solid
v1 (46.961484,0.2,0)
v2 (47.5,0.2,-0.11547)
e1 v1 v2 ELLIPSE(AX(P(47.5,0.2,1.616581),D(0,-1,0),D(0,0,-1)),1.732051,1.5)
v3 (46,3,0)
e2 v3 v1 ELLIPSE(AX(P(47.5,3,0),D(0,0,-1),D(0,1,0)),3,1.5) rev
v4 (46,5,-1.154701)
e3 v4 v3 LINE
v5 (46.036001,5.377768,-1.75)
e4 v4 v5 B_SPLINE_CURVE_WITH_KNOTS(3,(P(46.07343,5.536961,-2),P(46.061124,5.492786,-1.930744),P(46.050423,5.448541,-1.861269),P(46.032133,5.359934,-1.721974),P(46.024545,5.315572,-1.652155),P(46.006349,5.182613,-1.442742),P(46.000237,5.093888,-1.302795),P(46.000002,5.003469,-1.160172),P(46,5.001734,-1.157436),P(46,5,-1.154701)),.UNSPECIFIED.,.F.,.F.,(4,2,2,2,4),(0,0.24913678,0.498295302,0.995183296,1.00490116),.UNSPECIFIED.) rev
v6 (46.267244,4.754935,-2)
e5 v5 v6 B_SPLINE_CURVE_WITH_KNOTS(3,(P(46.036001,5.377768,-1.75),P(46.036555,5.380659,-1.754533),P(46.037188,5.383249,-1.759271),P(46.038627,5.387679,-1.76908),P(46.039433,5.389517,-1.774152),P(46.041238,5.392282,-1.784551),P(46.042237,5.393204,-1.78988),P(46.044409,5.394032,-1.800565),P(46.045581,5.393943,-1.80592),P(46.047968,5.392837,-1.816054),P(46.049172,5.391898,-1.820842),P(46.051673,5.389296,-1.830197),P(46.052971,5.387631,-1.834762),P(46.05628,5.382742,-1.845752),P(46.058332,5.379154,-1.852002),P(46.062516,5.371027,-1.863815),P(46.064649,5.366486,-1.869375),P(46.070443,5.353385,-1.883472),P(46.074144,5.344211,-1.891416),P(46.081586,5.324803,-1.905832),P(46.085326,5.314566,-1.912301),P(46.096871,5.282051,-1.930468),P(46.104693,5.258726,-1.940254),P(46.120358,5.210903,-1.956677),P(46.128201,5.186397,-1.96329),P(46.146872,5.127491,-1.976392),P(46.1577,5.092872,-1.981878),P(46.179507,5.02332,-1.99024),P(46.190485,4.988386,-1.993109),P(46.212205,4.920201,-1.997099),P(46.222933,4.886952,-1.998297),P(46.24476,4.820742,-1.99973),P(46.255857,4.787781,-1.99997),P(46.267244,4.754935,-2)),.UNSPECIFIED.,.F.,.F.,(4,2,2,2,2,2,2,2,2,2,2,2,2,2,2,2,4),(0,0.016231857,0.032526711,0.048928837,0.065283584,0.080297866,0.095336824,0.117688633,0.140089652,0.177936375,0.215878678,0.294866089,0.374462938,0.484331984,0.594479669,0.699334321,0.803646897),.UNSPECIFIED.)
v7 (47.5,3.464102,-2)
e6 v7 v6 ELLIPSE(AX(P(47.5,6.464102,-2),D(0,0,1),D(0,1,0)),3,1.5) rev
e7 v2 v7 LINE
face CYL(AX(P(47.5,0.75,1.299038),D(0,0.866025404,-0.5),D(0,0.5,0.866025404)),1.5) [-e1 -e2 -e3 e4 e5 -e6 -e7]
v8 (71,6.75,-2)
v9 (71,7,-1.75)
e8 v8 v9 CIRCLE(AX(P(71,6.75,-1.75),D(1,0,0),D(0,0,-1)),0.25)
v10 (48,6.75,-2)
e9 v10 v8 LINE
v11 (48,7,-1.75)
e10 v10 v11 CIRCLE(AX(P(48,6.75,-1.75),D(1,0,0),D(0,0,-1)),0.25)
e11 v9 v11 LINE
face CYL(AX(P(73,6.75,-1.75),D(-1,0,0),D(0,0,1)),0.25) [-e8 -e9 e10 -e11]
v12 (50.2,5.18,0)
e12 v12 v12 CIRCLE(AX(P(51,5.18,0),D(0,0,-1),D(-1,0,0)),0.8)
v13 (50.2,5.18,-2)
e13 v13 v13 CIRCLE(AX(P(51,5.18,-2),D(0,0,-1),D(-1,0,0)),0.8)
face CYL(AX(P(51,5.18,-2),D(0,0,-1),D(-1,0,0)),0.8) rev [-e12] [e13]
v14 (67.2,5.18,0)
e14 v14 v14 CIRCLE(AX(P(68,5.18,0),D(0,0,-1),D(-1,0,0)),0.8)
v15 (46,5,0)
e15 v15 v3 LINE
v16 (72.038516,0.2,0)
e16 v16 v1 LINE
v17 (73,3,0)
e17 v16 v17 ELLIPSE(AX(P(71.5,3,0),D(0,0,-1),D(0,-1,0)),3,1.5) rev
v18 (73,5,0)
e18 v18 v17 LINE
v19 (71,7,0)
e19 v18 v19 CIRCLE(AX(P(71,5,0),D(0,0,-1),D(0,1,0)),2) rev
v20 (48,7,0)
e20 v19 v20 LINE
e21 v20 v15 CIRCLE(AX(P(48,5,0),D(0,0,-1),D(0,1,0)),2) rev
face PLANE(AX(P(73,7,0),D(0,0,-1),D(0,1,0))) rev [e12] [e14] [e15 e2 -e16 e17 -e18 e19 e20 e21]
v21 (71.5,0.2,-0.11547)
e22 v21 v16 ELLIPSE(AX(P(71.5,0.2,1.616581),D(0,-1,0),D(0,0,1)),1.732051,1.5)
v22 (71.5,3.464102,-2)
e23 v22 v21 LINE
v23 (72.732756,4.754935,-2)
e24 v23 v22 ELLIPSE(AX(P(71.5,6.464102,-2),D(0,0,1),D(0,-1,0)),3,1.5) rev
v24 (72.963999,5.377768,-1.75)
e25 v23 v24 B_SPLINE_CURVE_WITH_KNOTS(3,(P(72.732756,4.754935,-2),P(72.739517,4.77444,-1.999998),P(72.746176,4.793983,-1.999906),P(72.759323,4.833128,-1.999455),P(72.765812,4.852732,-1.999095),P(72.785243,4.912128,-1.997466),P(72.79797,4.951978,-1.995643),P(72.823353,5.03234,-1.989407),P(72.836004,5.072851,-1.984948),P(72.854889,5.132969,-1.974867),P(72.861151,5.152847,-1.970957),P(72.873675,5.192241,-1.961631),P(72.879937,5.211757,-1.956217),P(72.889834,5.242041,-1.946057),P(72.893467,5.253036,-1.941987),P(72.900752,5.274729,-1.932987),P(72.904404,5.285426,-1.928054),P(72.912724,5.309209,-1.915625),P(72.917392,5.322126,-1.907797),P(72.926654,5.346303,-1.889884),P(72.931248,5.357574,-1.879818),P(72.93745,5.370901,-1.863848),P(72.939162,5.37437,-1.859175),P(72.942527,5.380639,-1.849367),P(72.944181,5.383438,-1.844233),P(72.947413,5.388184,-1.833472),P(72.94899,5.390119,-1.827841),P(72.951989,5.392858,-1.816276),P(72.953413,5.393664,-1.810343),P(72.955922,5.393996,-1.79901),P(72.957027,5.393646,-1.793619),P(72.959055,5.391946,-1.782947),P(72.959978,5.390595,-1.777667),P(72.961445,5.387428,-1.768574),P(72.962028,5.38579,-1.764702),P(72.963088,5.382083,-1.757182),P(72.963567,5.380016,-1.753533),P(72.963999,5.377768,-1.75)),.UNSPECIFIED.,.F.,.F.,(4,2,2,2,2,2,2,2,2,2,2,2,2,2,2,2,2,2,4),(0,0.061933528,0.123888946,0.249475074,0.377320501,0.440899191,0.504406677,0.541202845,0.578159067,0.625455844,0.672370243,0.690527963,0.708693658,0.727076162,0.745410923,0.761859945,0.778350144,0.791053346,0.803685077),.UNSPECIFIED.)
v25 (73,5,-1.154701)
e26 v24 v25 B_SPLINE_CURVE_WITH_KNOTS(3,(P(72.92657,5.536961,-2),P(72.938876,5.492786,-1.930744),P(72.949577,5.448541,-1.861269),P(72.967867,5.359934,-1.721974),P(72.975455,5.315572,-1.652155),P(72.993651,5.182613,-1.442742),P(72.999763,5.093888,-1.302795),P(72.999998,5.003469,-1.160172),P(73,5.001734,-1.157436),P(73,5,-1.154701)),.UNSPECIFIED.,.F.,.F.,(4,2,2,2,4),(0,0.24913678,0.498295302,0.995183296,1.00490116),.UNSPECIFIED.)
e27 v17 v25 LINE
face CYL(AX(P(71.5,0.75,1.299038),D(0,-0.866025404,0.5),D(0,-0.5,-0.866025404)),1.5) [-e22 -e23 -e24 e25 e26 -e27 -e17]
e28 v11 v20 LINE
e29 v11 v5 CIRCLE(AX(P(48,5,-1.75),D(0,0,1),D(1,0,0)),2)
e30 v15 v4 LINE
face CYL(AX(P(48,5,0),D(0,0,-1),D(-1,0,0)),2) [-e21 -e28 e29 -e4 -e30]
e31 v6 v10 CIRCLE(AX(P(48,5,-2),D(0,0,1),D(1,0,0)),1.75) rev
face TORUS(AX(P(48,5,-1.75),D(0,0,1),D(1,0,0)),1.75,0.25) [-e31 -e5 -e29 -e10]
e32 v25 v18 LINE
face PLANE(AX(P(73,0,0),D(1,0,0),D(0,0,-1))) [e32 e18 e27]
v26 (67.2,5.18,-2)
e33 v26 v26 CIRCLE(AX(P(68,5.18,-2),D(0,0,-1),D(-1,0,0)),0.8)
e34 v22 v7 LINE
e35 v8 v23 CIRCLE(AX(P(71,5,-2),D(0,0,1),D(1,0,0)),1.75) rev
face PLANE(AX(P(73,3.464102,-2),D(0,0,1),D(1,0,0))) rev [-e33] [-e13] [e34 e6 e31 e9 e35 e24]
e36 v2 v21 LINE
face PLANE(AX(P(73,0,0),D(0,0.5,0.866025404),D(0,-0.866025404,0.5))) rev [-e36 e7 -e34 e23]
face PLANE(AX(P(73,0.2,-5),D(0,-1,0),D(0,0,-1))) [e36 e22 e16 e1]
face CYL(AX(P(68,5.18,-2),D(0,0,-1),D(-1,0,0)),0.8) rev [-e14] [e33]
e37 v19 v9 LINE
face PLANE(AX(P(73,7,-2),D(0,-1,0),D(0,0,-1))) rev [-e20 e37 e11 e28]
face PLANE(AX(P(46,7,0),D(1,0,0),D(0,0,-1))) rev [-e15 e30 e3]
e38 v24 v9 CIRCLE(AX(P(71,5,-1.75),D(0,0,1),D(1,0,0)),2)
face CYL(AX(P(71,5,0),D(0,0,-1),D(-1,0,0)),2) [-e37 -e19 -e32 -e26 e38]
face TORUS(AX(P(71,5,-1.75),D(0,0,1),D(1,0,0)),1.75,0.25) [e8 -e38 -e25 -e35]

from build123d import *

# Parameters (mm, degrees)
WEDGE_GENERAL_SHAPE_DEPTH       = 73
SKETCH7_W                       = 10
SKETCH7_H                       = 0.2
KNIFE_EDGE_REMOVER_DEPTH        = 74.362115564
FILLET5_R                       = 1.5
FILLET2_START                   = -3
FILLET2_DEPTH                   = 4
BABY_WEDGE_SHORTENER_DEPTH      = 74.362115676
BABY_WEDGE_SHORTENER_DEPTH_BACK = 74.362115676
SKETCH11_W                      = 46
SKETCH11_H                      = 7
FILLET1_R                       = 1.5
FILLET3_START                   = -3
FILLET3_DEPTH                   = 4
BABY_WEDGE_M2_HOLES_D           = 1.6
BITEFILLET_R                    = 0.25


with BuildPart() as part:
    # Sketch2 → Wedge General Shape (new body)
    with BuildSketch(Plane(origin=(0, 0, 0), x_dir=(0, 0, -1), z_dir=(1, 0, 0))):
        Polygon((0, 7), (0, 0), (2, 3.464101615), (2, 7), align=None)
    extrude(amount=WEDGE_GENERAL_SHAPE_DEPTH)

    # Sketch7 → Knife Edge Remover (cut, through all)
    with BuildSketch(Plane(origin=(0, 0, 0), x_dir=(0, 0, -1), z_dir=(1, 0, 0))):
        with Locations((0, 0.1)):
            Rectangle(SKETCH7_W, SKETCH7_H)
    extrude(amount=KNIFE_EDGE_REMOVER_DEPTH, mode=Mode.SUBTRACT)

    # Fillet5
    fillet5_edges = [part.edges().sort_by_distance(p)[0] for p in [
        (73, 1.832050808, -1.057735027),
    ]]
    fillet(fillet5_edges, radius=FILLET5_R)

    # Fillet2: read off the stored shape, not the designer's step
    # Fillet2 outline → Fillet2 (cut)
    with BuildSketch(Plane.XY.offset(FILLET2_START)):
        with BuildLine():
            Line((73, 7), (71, 7))
            ThreePointArc((71, 7), (72.414213562, 6.414213562), (73, 5))
            Line((73, 5), (73, 7))
        make_face()
        with BuildLine():
            ThreePointArc((0, 5), (0.585786438, 6.414213562), (2, 7))
            Line((2, 7), (0, 7))
            Line((0, 7), (0, 5))
        make_face()
    extrude(amount=FILLET2_DEPTH, mode=Mode.SUBTRACT)

    # Sketch11 → Baby Wedge Shortener (cut, two sides: drawn at the far end of the back side and taken through both)
    with BuildSketch(Plane(origin=(0, 0, -2), x_dir=(-1, 0, 0), z_dir=(0, 0, -1)).offset(-BABY_WEDGE_SHORTENER_DEPTH_BACK)):
        with Locations((-23, 3.5)):
            Rectangle(SKETCH11_W, SKETCH11_H)
    extrude(amount=BABY_WEDGE_SHORTENER_DEPTH + BABY_WEDGE_SHORTENER_DEPTH_BACK, mode=Mode.SUBTRACT)

    # Fillet1
    fillet1_edges = [part.edges().sort_by_distance(p)[0] for p in [
        (46, 1.832050808, -1.057735027),
    ]]
    fillet(fillet1_edges, radius=FILLET1_R)

    # Fillet3: read off the stored shape, not the designer's step
    # Fillet3 outline → Fillet3 (cut)
    with BuildSketch(Plane.XY.offset(FILLET3_START)):
        with BuildLine():
            Line((46, 7), (46, 5))
            ThreePointArc((46, 5), (46.585786438, 6.414213562), (48, 7))
            Line((48, 7), (46, 7))
        make_face()
    extrude(amount=FILLET3_DEPTH, mode=Mode.SUBTRACT)

    # Baby Wedge M2 Holes (through all)
    with Locations(Plane(origin=(0, 0, -2), x_dir=(-1, 0, 0), z_dir=(0, 0, -1))):
        with Locations((-68, 5.18), (-51, 5.18)):
            Hole(BABY_WEDGE_M2_HOLES_D / 2)

    # BiteFillet
    bitefillet_edges = [part.edges().sort_by_distance(p)[0] for p in [
        (72.209561466, 6.592784059, -2),
        (46.790438534, 6.592784059, -2),
        (59.5, 7, -2),
    ]]
    fillet(bitefillet_edges, radius=BITEFILLET_R)


solid = part.part
